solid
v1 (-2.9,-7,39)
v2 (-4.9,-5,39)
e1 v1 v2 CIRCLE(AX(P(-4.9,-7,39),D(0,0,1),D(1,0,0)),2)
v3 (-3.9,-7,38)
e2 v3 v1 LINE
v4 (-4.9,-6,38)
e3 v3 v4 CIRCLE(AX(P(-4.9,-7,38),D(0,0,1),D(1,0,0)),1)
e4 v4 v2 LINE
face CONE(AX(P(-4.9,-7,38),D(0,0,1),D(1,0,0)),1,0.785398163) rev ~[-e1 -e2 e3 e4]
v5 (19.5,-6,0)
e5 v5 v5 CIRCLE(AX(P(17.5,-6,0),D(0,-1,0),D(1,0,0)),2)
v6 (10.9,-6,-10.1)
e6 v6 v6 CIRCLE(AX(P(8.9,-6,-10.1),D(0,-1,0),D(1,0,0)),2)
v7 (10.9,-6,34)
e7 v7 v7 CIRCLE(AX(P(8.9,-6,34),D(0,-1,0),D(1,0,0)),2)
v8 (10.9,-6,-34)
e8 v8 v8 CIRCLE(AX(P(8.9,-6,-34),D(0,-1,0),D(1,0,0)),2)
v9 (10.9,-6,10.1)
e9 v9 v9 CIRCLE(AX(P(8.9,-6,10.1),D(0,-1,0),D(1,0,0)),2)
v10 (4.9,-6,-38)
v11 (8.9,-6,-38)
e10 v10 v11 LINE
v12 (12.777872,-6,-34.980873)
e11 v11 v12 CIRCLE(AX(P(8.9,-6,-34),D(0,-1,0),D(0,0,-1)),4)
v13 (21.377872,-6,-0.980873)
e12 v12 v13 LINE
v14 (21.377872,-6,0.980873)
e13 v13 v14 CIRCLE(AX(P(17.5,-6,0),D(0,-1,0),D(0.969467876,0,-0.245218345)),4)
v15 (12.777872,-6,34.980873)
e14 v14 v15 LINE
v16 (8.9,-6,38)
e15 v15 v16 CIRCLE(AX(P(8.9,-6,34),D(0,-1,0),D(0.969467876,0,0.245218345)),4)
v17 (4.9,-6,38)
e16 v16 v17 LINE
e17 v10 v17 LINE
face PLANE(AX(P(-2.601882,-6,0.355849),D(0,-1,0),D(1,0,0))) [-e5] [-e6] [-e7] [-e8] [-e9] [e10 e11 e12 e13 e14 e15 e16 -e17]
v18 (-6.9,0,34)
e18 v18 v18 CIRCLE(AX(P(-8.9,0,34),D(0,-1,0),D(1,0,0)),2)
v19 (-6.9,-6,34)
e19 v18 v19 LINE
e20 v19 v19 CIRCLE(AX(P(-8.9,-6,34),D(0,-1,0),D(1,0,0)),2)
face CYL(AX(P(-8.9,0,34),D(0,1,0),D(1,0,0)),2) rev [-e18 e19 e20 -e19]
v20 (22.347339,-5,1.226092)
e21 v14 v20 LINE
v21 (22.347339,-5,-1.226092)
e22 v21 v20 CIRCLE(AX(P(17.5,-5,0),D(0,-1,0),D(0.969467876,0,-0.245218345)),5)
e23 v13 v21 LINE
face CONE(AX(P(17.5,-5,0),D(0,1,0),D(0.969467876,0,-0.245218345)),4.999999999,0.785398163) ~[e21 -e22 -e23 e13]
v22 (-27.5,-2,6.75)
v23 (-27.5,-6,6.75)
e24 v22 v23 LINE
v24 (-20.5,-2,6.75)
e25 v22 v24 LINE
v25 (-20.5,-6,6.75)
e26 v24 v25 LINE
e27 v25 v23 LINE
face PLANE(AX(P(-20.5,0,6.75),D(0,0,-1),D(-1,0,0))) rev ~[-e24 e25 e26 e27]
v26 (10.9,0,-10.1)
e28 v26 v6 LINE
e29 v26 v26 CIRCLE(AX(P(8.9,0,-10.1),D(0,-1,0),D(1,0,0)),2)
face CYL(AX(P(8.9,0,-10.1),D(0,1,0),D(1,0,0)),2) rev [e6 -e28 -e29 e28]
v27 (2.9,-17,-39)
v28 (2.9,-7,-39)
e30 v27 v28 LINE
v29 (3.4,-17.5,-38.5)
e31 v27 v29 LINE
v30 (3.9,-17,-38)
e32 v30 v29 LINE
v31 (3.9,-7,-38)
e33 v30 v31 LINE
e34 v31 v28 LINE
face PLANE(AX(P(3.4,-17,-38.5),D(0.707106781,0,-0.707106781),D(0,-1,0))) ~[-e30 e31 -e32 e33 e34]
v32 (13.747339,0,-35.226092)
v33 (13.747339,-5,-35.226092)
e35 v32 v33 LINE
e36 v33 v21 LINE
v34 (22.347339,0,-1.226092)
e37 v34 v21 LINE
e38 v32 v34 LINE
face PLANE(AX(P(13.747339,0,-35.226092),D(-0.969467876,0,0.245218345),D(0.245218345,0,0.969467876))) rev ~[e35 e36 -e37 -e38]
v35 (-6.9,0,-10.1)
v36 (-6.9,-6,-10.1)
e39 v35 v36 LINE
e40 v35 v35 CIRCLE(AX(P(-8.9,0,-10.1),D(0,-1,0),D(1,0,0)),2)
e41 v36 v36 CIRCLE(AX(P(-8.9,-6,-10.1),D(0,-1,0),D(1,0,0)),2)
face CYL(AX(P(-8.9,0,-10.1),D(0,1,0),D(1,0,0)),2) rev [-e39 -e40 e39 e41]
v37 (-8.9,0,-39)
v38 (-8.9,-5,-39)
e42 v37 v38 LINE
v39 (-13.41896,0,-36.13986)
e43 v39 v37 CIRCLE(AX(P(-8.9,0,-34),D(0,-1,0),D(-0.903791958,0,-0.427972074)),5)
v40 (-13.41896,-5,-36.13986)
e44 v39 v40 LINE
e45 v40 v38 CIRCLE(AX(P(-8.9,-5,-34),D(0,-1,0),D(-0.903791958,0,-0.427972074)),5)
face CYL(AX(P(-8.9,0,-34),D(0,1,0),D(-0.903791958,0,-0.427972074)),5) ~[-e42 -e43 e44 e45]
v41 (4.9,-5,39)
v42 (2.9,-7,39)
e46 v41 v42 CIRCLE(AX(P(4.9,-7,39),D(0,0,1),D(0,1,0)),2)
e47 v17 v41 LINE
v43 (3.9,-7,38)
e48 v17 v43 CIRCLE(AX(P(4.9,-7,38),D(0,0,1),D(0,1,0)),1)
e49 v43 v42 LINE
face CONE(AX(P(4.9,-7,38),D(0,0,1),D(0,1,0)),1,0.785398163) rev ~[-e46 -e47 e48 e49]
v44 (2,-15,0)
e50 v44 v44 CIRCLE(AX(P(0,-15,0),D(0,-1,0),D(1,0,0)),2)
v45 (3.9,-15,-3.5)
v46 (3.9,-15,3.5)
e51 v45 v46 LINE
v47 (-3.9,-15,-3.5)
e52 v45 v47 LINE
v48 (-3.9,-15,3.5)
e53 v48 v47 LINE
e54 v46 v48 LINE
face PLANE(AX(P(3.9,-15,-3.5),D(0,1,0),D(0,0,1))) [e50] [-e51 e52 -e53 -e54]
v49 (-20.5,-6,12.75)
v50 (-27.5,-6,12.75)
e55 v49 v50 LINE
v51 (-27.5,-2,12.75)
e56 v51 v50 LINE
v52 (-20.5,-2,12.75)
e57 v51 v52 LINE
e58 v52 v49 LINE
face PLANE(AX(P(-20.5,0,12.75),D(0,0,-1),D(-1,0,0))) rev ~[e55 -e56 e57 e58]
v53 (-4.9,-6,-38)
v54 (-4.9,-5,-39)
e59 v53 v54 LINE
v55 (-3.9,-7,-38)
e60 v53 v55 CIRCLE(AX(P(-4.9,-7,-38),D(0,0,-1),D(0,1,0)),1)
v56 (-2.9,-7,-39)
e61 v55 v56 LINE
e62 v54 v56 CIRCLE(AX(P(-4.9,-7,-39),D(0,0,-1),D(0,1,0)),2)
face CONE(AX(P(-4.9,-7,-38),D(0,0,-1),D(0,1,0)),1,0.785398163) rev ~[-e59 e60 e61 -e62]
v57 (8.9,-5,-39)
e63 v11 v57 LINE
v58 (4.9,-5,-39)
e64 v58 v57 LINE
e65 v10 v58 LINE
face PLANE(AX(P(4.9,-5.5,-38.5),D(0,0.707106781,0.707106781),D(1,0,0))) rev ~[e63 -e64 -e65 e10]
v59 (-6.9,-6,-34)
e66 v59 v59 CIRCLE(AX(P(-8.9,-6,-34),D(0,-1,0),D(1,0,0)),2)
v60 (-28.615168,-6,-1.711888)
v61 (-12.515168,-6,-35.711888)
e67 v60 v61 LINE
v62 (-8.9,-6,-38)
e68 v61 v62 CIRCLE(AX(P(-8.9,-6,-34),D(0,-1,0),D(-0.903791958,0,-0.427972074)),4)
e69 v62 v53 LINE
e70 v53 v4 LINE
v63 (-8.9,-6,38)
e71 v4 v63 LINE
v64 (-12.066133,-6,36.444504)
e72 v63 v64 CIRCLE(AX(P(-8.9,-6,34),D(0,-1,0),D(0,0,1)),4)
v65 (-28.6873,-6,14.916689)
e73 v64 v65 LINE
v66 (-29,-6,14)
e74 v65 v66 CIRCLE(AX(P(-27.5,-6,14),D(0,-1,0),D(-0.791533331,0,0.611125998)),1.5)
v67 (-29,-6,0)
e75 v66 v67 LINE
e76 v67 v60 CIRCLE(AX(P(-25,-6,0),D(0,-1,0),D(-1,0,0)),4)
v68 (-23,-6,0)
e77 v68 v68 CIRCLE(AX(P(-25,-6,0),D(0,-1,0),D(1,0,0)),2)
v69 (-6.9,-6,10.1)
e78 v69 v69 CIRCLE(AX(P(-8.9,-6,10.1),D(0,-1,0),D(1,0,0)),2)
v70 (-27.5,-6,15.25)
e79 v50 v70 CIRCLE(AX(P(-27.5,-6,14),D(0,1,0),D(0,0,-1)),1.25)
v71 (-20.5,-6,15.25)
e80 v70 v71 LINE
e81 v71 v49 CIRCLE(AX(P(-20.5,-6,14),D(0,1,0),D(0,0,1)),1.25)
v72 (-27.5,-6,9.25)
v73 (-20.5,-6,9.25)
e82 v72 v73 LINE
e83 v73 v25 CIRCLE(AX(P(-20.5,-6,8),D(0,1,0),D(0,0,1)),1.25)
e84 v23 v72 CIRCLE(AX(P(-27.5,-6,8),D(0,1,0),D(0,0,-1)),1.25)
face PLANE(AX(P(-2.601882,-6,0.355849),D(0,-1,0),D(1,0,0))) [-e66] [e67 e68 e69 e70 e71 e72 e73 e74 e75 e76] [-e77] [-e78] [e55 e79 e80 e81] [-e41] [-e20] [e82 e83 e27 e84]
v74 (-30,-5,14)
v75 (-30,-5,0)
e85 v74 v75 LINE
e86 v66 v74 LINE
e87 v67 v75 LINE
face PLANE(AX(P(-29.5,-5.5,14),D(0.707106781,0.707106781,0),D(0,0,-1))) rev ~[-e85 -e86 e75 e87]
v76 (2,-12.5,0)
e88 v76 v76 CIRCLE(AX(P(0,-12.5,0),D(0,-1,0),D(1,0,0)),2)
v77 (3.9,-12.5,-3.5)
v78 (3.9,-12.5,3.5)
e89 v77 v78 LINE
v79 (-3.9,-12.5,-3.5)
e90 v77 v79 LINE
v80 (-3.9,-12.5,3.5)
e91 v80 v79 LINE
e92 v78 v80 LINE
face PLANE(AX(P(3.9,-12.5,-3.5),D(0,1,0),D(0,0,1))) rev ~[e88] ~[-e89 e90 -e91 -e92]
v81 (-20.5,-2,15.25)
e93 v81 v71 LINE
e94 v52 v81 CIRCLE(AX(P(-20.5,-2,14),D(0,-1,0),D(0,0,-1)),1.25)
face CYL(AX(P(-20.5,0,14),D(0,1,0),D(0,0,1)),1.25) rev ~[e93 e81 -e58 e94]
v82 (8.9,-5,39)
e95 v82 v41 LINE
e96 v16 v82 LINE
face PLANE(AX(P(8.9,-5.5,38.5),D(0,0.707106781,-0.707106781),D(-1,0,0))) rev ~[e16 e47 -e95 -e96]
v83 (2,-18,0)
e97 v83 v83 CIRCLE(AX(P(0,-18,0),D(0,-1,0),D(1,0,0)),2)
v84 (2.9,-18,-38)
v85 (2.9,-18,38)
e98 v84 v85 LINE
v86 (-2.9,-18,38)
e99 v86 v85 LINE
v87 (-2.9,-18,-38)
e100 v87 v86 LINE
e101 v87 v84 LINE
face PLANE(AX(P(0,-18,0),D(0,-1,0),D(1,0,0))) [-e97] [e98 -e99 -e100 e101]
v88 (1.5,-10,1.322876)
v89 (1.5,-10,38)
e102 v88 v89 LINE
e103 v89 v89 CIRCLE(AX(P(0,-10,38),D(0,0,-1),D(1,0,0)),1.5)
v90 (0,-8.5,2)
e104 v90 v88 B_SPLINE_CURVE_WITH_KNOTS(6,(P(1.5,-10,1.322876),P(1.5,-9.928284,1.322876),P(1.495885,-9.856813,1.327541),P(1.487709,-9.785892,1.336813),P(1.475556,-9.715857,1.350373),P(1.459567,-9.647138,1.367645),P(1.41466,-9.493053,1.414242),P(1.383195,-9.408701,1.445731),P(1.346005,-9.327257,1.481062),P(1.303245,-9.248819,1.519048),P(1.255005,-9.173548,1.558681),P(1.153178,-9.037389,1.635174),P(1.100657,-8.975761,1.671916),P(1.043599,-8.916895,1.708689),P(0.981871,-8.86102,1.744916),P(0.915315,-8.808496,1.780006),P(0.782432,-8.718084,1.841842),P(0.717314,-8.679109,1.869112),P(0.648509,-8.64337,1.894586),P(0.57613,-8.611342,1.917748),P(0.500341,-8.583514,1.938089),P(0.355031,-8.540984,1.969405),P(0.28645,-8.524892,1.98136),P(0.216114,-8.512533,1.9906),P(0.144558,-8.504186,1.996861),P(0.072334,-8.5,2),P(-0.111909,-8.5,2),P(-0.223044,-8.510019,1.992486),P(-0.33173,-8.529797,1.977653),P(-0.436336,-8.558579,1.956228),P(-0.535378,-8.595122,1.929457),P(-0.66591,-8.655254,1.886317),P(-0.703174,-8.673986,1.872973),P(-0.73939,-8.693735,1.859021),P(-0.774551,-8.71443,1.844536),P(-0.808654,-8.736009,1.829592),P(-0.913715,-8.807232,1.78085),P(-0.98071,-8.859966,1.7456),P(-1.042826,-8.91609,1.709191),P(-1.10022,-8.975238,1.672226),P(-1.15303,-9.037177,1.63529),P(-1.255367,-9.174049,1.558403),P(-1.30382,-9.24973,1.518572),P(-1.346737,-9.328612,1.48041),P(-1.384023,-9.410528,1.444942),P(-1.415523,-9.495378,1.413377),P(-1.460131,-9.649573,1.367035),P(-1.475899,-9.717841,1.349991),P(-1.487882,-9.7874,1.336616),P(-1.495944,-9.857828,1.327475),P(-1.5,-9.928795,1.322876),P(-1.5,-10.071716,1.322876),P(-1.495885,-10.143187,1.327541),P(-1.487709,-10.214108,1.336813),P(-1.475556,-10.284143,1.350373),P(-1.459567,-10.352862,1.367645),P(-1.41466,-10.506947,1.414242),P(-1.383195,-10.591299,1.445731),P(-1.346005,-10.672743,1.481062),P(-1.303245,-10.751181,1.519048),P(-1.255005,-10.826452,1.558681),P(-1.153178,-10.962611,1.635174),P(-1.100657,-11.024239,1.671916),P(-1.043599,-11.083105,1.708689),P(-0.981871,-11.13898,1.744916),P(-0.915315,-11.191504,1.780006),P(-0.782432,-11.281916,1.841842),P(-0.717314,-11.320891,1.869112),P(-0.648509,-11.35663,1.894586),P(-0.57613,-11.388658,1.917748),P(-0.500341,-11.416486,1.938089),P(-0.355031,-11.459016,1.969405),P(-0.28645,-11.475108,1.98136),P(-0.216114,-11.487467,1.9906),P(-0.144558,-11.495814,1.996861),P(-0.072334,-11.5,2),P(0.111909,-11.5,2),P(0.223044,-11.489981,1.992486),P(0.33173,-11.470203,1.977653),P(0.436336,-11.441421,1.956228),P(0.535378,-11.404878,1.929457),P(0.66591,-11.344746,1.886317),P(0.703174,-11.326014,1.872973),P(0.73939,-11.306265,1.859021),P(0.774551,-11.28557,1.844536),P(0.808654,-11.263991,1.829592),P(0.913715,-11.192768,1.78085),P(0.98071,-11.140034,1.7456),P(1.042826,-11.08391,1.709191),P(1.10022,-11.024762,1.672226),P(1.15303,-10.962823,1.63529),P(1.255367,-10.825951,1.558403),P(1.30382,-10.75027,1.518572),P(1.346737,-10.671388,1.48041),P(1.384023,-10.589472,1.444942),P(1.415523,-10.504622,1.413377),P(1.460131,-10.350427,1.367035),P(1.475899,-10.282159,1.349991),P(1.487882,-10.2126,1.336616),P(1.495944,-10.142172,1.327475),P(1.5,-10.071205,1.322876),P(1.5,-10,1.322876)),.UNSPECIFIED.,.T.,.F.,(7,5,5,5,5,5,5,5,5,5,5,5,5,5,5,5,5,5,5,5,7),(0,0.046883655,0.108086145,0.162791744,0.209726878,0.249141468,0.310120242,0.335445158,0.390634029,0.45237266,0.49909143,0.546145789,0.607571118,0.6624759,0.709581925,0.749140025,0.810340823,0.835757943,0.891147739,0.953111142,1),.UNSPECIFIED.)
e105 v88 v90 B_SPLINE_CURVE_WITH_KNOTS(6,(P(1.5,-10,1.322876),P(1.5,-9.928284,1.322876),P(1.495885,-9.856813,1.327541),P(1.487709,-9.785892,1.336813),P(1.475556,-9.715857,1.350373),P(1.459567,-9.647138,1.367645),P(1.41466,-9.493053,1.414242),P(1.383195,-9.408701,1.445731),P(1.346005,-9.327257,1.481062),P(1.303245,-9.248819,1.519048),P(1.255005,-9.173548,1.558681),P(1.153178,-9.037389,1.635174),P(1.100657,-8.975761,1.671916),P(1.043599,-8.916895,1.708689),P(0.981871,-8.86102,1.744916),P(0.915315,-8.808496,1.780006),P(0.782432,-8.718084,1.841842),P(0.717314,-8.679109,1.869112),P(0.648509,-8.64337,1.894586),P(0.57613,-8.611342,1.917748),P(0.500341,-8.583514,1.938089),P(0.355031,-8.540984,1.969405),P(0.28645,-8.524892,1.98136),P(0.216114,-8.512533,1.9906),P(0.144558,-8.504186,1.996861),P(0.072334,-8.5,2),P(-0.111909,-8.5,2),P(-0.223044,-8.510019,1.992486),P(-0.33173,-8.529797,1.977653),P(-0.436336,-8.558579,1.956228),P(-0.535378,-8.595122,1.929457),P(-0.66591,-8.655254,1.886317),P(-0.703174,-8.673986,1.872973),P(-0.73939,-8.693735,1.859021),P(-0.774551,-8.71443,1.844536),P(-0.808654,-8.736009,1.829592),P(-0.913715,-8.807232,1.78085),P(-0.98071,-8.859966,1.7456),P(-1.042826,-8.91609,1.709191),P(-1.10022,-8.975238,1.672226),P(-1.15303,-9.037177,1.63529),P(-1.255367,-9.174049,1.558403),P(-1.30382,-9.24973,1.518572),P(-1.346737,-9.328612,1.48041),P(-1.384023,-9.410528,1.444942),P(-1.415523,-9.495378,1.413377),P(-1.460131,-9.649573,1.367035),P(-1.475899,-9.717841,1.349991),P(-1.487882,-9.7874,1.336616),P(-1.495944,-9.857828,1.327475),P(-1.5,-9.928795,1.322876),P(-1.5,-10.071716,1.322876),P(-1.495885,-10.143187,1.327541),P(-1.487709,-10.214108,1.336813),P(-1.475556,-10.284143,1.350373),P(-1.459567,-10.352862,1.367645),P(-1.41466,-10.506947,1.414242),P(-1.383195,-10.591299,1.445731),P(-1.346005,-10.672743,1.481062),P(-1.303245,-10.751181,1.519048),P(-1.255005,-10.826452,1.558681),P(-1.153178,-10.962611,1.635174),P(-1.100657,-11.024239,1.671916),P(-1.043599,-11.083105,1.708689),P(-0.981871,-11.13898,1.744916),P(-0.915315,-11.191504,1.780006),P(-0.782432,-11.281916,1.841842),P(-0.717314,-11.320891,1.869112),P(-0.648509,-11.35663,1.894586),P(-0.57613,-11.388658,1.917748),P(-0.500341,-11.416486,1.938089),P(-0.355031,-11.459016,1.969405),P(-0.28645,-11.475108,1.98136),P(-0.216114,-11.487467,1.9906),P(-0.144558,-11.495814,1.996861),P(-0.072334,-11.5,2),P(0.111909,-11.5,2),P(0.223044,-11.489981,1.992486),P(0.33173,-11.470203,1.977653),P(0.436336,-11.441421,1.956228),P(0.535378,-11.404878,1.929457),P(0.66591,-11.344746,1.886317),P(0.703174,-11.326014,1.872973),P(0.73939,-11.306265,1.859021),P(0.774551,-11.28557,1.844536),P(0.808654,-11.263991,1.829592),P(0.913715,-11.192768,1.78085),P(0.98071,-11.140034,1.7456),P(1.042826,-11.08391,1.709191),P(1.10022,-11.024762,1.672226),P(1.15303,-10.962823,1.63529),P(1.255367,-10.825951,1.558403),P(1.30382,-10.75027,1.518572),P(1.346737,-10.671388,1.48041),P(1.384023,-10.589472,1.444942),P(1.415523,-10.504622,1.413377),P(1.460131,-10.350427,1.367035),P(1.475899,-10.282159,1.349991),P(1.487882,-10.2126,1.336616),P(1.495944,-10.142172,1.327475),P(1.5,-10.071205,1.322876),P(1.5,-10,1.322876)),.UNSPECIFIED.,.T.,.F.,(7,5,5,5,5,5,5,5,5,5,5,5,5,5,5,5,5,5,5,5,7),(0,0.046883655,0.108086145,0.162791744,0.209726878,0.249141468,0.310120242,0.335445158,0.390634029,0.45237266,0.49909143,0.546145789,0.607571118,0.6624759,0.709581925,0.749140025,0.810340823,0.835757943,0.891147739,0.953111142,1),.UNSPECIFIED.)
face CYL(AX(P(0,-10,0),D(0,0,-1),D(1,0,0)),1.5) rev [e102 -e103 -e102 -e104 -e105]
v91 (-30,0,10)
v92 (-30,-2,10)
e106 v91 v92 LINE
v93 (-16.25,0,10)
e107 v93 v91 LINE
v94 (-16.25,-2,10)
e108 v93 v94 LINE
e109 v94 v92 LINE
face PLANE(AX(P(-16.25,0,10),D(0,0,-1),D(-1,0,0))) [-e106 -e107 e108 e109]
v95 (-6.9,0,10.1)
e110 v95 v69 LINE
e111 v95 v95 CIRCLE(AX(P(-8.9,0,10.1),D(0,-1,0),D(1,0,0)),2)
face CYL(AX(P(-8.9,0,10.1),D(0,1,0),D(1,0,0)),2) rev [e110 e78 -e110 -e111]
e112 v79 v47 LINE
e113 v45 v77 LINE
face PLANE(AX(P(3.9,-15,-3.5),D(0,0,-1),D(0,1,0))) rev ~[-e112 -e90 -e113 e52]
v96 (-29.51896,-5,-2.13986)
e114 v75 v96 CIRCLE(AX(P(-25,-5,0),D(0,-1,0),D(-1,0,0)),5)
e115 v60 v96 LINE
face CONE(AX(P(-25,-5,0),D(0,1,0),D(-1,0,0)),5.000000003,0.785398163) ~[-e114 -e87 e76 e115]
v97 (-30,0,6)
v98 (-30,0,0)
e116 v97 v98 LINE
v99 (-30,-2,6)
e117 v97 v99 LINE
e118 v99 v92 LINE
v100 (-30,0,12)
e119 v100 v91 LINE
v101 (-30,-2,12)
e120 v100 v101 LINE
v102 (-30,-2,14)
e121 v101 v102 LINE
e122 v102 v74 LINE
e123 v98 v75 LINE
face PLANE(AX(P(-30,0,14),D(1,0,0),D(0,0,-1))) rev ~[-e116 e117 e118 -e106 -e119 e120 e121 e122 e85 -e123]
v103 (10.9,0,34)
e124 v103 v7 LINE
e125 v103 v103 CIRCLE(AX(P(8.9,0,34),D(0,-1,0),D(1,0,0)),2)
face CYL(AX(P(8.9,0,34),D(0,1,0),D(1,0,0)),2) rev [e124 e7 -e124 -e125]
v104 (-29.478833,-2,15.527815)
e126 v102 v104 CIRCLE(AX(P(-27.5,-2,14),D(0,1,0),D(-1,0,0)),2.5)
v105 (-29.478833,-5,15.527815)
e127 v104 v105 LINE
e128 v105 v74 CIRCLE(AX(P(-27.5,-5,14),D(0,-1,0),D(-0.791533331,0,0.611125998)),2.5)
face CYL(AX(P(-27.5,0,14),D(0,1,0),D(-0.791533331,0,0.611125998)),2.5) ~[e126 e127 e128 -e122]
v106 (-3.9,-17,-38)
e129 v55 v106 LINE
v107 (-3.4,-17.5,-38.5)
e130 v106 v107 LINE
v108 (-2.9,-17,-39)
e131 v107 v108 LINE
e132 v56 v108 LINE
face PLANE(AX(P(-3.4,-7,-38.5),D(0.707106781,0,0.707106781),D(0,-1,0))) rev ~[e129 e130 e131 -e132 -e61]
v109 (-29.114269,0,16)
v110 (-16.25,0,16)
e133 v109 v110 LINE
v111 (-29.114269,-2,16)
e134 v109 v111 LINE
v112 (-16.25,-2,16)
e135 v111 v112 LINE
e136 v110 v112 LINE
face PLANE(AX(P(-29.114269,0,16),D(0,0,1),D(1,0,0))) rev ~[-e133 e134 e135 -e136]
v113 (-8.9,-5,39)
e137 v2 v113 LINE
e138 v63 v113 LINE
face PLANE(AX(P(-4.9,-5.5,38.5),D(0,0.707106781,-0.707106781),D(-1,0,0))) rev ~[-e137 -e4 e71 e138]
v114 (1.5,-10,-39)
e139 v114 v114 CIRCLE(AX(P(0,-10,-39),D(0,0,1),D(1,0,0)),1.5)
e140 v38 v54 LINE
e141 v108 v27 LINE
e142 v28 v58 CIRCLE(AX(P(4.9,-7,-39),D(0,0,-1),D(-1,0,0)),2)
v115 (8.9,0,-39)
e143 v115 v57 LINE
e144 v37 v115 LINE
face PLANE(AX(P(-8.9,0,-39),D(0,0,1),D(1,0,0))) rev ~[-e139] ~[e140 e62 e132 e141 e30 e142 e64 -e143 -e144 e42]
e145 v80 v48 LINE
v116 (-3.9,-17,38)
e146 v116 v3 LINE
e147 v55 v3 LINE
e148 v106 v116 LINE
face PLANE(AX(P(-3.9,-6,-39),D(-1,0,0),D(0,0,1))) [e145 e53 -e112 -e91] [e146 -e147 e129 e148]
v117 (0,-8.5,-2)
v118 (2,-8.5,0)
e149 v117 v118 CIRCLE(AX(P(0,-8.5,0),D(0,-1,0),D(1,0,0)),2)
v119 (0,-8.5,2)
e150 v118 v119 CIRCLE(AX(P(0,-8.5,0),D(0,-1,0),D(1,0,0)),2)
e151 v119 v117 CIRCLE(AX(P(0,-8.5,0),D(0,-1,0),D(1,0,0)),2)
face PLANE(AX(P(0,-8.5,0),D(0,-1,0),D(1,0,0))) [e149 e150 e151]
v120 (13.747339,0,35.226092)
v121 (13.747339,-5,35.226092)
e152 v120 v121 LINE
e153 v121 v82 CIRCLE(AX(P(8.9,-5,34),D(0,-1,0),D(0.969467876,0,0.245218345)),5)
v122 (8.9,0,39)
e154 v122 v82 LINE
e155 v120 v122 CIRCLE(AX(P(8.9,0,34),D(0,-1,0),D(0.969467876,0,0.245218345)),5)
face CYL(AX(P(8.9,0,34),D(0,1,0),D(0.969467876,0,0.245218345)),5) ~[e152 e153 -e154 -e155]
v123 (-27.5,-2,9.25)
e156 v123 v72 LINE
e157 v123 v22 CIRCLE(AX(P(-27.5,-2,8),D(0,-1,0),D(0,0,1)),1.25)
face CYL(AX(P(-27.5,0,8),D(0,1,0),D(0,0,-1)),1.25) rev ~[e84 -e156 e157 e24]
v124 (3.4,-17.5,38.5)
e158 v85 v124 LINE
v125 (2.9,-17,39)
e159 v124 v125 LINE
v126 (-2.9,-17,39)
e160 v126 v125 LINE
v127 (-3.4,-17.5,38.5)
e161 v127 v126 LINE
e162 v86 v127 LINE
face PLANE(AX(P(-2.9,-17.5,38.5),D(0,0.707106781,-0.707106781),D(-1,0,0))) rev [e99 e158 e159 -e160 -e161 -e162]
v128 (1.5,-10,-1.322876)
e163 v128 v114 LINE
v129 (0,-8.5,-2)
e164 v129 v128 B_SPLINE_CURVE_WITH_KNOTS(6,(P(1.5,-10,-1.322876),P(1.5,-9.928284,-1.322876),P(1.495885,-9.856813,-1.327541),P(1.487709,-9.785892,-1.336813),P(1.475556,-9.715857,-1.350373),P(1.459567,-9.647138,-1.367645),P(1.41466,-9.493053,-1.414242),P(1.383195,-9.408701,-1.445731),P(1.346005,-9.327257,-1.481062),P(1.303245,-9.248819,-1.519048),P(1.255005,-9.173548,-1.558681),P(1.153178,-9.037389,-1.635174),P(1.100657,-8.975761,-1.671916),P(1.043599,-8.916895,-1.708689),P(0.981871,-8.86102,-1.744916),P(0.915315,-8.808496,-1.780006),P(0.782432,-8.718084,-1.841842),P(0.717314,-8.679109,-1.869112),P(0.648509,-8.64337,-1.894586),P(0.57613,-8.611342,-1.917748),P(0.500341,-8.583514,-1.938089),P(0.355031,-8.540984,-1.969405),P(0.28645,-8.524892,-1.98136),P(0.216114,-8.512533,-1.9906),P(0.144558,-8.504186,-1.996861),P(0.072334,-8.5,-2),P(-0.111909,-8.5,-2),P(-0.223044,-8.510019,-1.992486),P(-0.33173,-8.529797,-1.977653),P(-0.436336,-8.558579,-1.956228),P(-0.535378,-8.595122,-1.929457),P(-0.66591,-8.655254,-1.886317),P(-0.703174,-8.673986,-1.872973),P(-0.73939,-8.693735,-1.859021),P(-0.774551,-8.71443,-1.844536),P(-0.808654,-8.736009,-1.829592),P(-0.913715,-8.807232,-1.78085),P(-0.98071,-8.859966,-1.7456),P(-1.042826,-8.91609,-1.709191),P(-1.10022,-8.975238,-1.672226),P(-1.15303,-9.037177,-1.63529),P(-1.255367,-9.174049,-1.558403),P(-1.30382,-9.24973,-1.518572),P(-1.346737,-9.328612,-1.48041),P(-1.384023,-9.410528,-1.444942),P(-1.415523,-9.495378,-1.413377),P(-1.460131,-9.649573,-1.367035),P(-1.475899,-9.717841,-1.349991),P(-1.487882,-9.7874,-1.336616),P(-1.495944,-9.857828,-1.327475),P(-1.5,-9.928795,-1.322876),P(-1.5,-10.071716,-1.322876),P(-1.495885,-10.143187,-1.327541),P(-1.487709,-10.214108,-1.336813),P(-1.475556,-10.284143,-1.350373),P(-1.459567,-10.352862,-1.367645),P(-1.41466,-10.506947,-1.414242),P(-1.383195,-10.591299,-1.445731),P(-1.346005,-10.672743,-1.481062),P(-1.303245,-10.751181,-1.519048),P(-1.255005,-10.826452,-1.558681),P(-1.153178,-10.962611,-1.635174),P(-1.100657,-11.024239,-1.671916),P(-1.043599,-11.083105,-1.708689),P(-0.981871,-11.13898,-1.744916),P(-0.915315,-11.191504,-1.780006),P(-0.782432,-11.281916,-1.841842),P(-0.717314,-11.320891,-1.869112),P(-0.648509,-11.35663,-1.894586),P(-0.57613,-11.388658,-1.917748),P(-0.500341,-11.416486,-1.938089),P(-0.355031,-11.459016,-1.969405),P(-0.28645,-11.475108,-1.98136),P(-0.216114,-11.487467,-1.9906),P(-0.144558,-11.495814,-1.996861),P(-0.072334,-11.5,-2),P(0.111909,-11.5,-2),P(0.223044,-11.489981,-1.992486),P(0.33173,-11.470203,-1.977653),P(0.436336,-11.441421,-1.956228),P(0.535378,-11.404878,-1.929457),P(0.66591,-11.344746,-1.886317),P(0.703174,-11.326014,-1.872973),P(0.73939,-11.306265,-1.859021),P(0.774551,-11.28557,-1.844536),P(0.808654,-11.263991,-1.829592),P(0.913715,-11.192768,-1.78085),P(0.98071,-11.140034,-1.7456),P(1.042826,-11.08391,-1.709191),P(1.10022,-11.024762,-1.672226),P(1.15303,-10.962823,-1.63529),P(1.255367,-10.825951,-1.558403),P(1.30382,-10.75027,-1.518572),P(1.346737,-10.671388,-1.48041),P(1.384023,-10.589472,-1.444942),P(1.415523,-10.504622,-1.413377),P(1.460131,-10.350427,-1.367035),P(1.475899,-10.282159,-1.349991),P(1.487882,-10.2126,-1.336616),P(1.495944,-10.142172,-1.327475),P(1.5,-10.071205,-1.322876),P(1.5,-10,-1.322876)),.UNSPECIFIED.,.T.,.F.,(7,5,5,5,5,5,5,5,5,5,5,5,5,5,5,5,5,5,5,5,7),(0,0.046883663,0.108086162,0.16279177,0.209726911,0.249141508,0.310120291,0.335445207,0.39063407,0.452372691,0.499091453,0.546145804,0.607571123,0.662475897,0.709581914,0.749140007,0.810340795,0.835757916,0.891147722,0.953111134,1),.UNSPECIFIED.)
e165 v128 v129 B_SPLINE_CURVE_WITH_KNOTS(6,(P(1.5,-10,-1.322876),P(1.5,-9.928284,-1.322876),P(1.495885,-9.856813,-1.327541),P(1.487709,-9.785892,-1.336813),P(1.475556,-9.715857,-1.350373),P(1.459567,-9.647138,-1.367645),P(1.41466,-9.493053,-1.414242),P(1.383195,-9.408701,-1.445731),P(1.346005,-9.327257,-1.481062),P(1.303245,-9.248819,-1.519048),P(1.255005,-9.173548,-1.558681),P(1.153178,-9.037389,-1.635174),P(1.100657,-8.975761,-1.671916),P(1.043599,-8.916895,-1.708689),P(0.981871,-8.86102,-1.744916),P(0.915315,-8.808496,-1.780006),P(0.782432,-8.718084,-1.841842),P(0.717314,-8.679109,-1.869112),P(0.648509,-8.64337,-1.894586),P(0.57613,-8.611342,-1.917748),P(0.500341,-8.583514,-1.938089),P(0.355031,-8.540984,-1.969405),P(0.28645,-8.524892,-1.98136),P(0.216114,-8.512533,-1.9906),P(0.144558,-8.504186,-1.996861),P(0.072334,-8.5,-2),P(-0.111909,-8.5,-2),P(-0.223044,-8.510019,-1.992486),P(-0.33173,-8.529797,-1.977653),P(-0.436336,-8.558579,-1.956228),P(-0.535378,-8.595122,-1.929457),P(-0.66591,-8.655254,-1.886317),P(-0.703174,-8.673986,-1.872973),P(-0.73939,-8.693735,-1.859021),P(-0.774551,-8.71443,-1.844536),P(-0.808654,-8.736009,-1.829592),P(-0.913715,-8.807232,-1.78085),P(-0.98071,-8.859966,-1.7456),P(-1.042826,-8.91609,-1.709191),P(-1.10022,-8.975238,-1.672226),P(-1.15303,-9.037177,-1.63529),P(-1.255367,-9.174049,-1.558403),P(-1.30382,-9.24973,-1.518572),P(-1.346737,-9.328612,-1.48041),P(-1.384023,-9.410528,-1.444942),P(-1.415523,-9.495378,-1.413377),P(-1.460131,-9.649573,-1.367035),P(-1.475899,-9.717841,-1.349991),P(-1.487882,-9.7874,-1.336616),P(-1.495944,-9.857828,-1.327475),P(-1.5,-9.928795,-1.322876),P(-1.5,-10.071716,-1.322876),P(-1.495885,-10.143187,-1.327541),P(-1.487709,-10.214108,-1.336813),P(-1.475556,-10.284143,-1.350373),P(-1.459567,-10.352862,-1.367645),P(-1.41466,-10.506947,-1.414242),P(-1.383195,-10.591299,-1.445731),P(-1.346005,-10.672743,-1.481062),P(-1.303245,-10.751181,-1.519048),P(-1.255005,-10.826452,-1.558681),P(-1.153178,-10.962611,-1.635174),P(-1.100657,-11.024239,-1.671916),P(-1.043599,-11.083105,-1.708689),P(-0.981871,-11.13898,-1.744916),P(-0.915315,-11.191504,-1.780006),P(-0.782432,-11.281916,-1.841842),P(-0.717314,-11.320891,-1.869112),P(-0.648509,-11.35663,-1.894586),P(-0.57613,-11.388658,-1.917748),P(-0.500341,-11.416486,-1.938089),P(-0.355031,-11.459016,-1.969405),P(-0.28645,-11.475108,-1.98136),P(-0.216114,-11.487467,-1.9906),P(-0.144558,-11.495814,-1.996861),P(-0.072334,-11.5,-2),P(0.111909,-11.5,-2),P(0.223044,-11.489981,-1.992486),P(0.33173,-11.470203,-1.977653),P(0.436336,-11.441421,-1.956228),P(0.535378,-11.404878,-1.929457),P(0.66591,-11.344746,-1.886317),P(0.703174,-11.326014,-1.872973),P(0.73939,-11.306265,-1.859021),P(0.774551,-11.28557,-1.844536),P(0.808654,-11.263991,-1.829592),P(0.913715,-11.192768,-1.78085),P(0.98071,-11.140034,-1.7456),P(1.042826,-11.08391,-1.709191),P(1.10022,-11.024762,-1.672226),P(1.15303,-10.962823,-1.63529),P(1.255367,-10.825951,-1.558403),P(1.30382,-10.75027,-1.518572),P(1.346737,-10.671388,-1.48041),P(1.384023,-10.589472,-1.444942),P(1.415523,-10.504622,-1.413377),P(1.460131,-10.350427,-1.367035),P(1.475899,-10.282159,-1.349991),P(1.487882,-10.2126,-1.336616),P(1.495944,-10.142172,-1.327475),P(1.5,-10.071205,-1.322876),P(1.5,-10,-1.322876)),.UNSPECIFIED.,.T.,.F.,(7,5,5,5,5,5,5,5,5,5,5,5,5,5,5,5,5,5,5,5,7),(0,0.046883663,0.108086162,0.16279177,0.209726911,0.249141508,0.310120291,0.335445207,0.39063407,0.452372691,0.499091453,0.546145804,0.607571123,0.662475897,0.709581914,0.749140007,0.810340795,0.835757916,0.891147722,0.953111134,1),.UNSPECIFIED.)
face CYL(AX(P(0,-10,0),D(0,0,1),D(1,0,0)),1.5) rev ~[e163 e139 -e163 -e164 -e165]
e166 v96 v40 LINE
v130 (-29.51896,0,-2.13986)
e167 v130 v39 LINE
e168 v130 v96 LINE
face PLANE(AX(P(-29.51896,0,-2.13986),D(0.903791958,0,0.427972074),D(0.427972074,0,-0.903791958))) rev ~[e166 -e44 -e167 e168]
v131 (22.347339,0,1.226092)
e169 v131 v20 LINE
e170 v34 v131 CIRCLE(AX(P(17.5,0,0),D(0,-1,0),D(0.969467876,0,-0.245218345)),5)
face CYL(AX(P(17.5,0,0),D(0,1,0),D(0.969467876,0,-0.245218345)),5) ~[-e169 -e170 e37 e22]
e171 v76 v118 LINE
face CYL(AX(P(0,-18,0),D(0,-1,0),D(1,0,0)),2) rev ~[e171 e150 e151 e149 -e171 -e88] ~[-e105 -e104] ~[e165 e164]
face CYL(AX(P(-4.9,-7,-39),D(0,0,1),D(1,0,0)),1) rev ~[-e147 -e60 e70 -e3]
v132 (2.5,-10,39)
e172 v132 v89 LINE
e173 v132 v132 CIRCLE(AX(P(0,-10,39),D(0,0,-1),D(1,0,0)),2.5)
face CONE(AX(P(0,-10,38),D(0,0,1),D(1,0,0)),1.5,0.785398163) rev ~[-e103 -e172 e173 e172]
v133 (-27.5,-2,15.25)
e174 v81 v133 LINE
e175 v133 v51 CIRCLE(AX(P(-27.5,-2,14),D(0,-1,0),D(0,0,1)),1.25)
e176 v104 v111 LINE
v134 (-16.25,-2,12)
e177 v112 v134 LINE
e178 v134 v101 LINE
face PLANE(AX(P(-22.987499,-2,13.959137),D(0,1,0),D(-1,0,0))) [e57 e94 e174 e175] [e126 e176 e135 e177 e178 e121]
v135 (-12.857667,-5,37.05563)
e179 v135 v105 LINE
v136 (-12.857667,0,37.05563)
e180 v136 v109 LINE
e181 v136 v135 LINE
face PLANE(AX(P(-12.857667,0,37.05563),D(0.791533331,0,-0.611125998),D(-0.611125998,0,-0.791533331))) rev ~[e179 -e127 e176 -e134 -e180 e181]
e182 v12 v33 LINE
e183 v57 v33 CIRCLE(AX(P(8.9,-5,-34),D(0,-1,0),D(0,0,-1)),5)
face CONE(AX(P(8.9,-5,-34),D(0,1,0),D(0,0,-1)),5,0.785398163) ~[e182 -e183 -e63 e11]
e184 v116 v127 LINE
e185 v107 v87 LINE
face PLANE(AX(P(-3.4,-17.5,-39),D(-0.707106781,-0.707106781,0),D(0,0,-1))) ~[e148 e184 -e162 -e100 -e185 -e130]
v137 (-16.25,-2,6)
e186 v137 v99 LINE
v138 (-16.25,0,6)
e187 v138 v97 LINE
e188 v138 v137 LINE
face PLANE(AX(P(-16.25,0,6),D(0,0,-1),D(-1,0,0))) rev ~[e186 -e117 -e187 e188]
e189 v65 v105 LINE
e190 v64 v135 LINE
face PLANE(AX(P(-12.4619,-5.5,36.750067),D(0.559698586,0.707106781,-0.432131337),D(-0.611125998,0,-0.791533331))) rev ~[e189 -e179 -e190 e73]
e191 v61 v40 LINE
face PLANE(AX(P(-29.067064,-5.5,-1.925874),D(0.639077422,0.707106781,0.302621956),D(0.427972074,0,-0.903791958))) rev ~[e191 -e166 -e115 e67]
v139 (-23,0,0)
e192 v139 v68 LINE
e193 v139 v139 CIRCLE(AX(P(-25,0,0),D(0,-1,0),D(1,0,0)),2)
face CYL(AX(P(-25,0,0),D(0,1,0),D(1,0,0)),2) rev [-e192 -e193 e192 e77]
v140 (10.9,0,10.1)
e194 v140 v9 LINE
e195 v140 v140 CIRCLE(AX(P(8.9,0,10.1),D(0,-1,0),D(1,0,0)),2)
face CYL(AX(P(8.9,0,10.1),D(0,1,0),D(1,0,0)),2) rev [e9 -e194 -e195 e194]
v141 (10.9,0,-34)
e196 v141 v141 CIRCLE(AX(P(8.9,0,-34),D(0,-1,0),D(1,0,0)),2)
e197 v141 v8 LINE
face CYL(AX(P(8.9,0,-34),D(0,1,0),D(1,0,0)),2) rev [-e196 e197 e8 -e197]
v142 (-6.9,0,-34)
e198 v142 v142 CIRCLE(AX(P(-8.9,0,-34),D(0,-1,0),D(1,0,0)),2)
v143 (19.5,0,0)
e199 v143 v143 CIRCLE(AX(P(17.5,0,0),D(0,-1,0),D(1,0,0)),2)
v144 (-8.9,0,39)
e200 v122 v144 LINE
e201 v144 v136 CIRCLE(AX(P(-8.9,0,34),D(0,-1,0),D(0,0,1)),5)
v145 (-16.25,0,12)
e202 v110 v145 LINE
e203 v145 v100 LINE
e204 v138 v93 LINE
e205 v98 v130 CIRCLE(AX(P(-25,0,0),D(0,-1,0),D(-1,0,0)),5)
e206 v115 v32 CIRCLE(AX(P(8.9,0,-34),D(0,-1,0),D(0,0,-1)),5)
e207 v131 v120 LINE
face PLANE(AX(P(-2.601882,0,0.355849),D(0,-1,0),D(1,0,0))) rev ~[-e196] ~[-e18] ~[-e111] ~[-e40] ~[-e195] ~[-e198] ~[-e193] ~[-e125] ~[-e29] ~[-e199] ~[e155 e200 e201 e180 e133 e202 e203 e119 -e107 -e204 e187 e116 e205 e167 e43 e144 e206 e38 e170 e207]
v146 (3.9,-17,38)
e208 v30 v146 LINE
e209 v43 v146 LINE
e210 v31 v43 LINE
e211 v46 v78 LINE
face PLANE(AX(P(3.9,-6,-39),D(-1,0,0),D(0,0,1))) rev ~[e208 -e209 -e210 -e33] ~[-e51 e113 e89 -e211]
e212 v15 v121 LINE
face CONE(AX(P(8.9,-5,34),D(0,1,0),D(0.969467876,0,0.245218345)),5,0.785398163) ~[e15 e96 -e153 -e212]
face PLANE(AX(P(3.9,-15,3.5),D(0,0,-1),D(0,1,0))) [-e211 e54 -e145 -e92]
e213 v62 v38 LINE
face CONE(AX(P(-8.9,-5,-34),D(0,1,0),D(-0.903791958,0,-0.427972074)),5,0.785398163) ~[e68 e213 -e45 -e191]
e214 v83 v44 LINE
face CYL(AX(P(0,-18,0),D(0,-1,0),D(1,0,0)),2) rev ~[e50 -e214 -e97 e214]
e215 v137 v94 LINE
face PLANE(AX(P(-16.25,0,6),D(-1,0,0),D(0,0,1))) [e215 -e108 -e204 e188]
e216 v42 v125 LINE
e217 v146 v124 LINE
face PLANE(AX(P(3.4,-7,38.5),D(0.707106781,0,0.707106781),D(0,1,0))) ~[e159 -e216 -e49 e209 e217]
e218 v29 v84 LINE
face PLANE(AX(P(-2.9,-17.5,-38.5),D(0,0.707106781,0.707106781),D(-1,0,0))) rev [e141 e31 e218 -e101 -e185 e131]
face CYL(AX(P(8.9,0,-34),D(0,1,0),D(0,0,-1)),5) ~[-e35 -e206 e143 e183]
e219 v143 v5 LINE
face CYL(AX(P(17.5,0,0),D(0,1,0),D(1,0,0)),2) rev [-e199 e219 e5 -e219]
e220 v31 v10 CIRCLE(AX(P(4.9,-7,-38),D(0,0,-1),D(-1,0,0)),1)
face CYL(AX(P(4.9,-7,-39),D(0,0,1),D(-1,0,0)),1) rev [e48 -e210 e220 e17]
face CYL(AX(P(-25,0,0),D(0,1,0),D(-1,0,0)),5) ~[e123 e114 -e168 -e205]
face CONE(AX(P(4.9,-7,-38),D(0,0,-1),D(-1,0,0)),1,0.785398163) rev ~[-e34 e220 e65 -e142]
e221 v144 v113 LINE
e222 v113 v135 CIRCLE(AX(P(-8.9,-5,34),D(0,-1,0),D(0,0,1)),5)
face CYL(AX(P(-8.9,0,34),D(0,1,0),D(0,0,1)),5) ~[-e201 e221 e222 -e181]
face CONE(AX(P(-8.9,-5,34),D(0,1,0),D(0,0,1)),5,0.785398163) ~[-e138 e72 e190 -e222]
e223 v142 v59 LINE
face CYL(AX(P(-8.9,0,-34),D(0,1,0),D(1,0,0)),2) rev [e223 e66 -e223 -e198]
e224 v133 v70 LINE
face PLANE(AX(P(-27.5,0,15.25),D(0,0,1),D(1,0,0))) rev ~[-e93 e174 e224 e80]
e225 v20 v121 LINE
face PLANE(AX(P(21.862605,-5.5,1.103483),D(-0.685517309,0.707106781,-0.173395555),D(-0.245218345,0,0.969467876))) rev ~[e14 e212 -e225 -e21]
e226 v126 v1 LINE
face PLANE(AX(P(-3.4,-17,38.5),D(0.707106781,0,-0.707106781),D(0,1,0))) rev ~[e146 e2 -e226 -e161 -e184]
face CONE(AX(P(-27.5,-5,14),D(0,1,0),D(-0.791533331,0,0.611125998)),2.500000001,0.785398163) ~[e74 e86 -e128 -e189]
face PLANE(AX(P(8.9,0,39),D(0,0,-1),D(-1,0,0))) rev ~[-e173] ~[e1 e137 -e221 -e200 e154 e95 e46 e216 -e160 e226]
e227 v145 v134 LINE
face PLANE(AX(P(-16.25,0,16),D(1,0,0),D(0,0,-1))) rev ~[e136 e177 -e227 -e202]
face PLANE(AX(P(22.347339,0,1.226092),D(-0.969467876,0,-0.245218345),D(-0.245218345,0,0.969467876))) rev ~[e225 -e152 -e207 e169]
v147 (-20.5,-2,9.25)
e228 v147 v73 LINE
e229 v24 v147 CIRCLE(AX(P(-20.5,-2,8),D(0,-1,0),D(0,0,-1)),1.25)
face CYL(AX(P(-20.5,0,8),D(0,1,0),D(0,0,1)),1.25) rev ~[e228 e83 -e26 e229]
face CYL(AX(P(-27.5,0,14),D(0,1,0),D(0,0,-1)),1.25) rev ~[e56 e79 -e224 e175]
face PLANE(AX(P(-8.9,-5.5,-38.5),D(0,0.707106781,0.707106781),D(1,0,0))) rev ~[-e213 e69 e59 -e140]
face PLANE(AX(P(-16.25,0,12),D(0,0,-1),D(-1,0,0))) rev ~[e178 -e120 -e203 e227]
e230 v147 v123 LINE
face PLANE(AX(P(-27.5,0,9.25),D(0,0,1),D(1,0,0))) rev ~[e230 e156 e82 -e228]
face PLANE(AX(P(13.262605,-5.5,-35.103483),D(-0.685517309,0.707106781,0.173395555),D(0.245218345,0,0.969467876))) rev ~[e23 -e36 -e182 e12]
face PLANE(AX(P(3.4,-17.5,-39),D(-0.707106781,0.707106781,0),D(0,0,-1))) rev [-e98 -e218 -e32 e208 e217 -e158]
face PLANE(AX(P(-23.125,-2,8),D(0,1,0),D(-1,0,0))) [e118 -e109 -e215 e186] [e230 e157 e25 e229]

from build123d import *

# Parameters (mm, degrees)
F0_R          = 2
F1_DEPTH      = 6
F2_W          = 7.8
F2_H          = 78
F3_DEPTH      = 12
F4_R          = 2
F5_DEPTH      = 12
F6_W          = 2.5
F6_H          = 7
F7_DEPTH      = 33.901
F8_R          = 1.5
F9_DEPTH      = 39.001
F9_DEPTH_BACK = 39.001
F10_DEPTH     = 2.5
F11_SIZE      = 1
F12_R         = 1
F13_SIZE      = 1
F14_SIZE      = 1
F15_W         = 13.75
F15_H         = 4
F16_DEPTH     = 2


# Not quite as in the source:
# - a feature names something its author has since deleted; it is built from what else it names


with BuildPart() as f1:
    # F0 (on Front) → F1 (new body)
    with BuildSketch(Plane.XZ):
        with BuildLine():
            Line((22.3473393815, 1.2260917259), (13.7473393815, 35.2260917259))
            ThreePointArc((13.7473393815, 35.2260917259), (11.9716071828, 37.9452793709), (8.9, 39))
            Line((8.9, 39), (-8.9, 39))
            ThreePointArc((-8.9, 39), (-11.1047505583, 38.4876580725), (-12.8576666563, 37.0556299903))
            Line((-12.8576666563, 37.0556299903), (-29.4788333281, 15.5278149952))
            ThreePointArc((-29.4788333281, 15.5278149952), (-29.8661237626, 14.8071296921), (-30, 14))
            Line((-30, 14), (-30, 0))
            ThreePointArc((-30, 0), (-29.8782578321, -1.0966314436), (-29.5189597908, -2.1398603715))
            Line((-29.5189597908, -2.1398603715), (-13.4189597908, -36.1398603715))
            ThreePointArc((-13.4189597908, -36.1398603715), (-11.5740136632, -38.2248847237), (-8.9, -39))
            Line((-8.9, -39), (8.9, -39))
            ThreePointArc((8.9, -39), (11.9716071828, -37.9452793709), (13.7473393815, -35.2260917259))
            Line((13.7473393815, -35.2260917259), (22.3473393815, -1.2260917259))
            ThreePointArc((22.3473393815, -1.2260917259), (22.5, 0), (22.3473393815, 1.2260917259))
        make_face()
        with Locations((-8.9, -34)):
            Circle(F0_R, mode=Mode.SUBTRACT)
        with Locations((-8.9, -10.1)):
            Circle(F0_R, mode=Mode.SUBTRACT)
        with Locations((8.9, -34)):
            Circle(F0_R, mode=Mode.SUBTRACT)
        with Locations((8.9, -10.1)):
            Circle(F0_R, mode=Mode.SUBTRACT)
        with Locations((-25, 0)):
            Circle(F0_R, mode=Mode.SUBTRACT)
        with BuildLine():
            ThreePointArc((-20.5, 9.25), (-19.25, 8), (-20.5, 6.75))
            Line((-20.5, 6.75), (-27.5, 6.75))
            ThreePointArc((-27.5, 6.75), (-28.75, 8), (-27.5, 9.25))
            Line((-27.5, 9.25), (-20.5, 9.25))
        make_face(mode=Mode.SUBTRACT)
        with BuildLine():
            ThreePointArc((-27.5, 12.75), (-28.75, 14), (-27.5, 15.25))
            Line((-27.5, 15.25), (-20.5, 15.25))
            ThreePointArc((-20.5, 15.25), (-19.25, 14), (-20.5, 12.75))
            Line((-20.5, 12.75), (-27.5, 12.75))
        make_face(mode=Mode.SUBTRACT)
        with Locations((-8.9, 10.1)):
            Circle(F0_R, mode=Mode.SUBTRACT)
        with Locations((-8.9, 34)):
            Circle(F0_R, mode=Mode.SUBTRACT)
        with Locations((8.9, 10.1)):
            Circle(F0_R, mode=Mode.SUBTRACT)
        with Locations((17.5, 0)):
            Circle(F0_R, mode=Mode.SUBTRACT)
        with Locations((8.9, 34)):
            Circle(F0_R, mode=Mode.SUBTRACT)
    extrude(amount=F1_DEPTH)

    # F2 (on face) → F3 (join)
    with BuildSketch(Plane.XZ.offset(6)):
        Rectangle(F2_W, F2_H)
    extrude(amount=F3_DEPTH)

    # F4 (on face) → F5 (cut, through all)
    with BuildSketch(Plane.XZ.offset(18)):
        Circle(F4_R)
    extrude(amount=-F5_DEPTH, mode=Mode.SUBTRACT)

    # F6 (on face) → F7 (cut, through all)
    with BuildSketch(Plane.YZ.offset(3.9)):
        with Locations((-13.75, 0)):
            Rectangle(F6_W, F6_H)
    extrude(amount=-F7_DEPTH, mode=Mode.SUBTRACT)

    # F8 (on Top) → F9 (cut, two sides)
    with BuildSketch(Plane.XY) as f9_sk:
        with Locations((0, -10)):
            Circle(F8_R)
    extrude(amount=-F9_DEPTH, mode=Mode.SUBTRACT)
    extrude(f9_sk.sketch, amount=F9_DEPTH_BACK, mode=Mode.SUBTRACT)

    # F10 (add): a face of the model
    f10_faces = [f1.faces().sort_by_distance(p)[0] for p in [
        (0, -6, 0),
    ]]
    extrude(f10_faces, amount=F10_DEPTH)

    # F11
    f11_edges = [f1.edges().sort_by_distance(p)[0] for p in [
        (3.9, -18, 0),
        (-3.9, -18, 0),
    ]]
    chamfer(f11_edges, length=F11_SIZE)

    # F12
    f12_edges = [f1.edges().sort_by_distance(p)[0] for p in [
        (-3.9, -6, 0),
        (3.9, -6, 0),
    ]]
    fillet(f12_edges, radius=F12_R)

    # F13 (call 1 of 4: OpenCascade refuses the feature's edges together)
    f13_edges = [f1.edges().sort_by_distance(p)[0] for p in [
        (18.047339, -6, 18.226092),
    ]]
    chamfer(f13_edges, length=F13_SIZE)

    # F13#2 (call 2 of 4)
    f13_2_edges = [f1.edges().sort_by_distance(p)[0] for p in [
        (0, -18, -39),
    ]]
    chamfer(f13_2_edges, length=F13_SIZE)

    # F13#3 (call 3 of 4)
    f13_3_edges = [f1.edges().sort_by_distance(p)[0] for p in [
        (0, -18, 39),
    ]]
    chamfer(f13_3_edges, length=F13_SIZE)

    # F13#4 (call 4 of 4)
    f13_4_edges = [f1.edges().sort_by_distance(p)[0] for p in [
        (-30, -6, 7),
    ]]
    chamfer(f13_4_edges, length=F13_SIZE)

    # F14
    f14_edges = [f1.edges().sort_by_distance(p)[0] for p in [
        (-1.5, -10, 39),
    ]]
    chamfer(f14_edges, length=F14_SIZE)

    # F15 (on face) → F16 (cut)
    with BuildSketch(Plane(origin=(0, 0, 0), x_dir=(-1, 0, 0), z_dir=(0, 1, 0))):
        with BuildLine():
            Line((29.1142693598, 16), (16.25, 16))
            Line((16.25, 16), (16.25, 12))
            Line((16.25, 12), (30, 12))
            Line((30, 12), (30, 14))
            ThreePointArc((30, 14), (29.8661237626, 14.8071296921), (29.4788333281, 15.5278149952))
            Line((29.4788333281, 15.5278149952), (29.1142693598, 16))
        make_face()
        with BuildLine():
            Line((20.5, 15.25), (27.5, 15.25))
            ThreePointArc((27.5, 15.25), (28.75, 14), (27.5, 12.75))
            Line((27.5, 12.75), (20.5, 12.75))
            ThreePointArc((20.5, 12.75), (19.25, 14), (20.5, 15.25))
        make_face(mode=Mode.SUBTRACT)
        with Locations((23.125, 8)):
            Rectangle(F15_W, F15_H)
        with BuildLine():
            Line((27.5, 6.75), (20.5, 6.75))
            ThreePointArc((20.5, 6.75), (19.25, 8), (20.5, 9.25))
            Line((20.5, 9.25), (27.5, 9.25))
            ThreePointArc((27.5, 9.25), (28.75, 8), (27.5, 6.75))
        make_face(mode=Mode.SUBTRACT)
    extrude(amount=-F16_DEPTH, mode=Mode.SUBTRACT)


solid = f1.part
